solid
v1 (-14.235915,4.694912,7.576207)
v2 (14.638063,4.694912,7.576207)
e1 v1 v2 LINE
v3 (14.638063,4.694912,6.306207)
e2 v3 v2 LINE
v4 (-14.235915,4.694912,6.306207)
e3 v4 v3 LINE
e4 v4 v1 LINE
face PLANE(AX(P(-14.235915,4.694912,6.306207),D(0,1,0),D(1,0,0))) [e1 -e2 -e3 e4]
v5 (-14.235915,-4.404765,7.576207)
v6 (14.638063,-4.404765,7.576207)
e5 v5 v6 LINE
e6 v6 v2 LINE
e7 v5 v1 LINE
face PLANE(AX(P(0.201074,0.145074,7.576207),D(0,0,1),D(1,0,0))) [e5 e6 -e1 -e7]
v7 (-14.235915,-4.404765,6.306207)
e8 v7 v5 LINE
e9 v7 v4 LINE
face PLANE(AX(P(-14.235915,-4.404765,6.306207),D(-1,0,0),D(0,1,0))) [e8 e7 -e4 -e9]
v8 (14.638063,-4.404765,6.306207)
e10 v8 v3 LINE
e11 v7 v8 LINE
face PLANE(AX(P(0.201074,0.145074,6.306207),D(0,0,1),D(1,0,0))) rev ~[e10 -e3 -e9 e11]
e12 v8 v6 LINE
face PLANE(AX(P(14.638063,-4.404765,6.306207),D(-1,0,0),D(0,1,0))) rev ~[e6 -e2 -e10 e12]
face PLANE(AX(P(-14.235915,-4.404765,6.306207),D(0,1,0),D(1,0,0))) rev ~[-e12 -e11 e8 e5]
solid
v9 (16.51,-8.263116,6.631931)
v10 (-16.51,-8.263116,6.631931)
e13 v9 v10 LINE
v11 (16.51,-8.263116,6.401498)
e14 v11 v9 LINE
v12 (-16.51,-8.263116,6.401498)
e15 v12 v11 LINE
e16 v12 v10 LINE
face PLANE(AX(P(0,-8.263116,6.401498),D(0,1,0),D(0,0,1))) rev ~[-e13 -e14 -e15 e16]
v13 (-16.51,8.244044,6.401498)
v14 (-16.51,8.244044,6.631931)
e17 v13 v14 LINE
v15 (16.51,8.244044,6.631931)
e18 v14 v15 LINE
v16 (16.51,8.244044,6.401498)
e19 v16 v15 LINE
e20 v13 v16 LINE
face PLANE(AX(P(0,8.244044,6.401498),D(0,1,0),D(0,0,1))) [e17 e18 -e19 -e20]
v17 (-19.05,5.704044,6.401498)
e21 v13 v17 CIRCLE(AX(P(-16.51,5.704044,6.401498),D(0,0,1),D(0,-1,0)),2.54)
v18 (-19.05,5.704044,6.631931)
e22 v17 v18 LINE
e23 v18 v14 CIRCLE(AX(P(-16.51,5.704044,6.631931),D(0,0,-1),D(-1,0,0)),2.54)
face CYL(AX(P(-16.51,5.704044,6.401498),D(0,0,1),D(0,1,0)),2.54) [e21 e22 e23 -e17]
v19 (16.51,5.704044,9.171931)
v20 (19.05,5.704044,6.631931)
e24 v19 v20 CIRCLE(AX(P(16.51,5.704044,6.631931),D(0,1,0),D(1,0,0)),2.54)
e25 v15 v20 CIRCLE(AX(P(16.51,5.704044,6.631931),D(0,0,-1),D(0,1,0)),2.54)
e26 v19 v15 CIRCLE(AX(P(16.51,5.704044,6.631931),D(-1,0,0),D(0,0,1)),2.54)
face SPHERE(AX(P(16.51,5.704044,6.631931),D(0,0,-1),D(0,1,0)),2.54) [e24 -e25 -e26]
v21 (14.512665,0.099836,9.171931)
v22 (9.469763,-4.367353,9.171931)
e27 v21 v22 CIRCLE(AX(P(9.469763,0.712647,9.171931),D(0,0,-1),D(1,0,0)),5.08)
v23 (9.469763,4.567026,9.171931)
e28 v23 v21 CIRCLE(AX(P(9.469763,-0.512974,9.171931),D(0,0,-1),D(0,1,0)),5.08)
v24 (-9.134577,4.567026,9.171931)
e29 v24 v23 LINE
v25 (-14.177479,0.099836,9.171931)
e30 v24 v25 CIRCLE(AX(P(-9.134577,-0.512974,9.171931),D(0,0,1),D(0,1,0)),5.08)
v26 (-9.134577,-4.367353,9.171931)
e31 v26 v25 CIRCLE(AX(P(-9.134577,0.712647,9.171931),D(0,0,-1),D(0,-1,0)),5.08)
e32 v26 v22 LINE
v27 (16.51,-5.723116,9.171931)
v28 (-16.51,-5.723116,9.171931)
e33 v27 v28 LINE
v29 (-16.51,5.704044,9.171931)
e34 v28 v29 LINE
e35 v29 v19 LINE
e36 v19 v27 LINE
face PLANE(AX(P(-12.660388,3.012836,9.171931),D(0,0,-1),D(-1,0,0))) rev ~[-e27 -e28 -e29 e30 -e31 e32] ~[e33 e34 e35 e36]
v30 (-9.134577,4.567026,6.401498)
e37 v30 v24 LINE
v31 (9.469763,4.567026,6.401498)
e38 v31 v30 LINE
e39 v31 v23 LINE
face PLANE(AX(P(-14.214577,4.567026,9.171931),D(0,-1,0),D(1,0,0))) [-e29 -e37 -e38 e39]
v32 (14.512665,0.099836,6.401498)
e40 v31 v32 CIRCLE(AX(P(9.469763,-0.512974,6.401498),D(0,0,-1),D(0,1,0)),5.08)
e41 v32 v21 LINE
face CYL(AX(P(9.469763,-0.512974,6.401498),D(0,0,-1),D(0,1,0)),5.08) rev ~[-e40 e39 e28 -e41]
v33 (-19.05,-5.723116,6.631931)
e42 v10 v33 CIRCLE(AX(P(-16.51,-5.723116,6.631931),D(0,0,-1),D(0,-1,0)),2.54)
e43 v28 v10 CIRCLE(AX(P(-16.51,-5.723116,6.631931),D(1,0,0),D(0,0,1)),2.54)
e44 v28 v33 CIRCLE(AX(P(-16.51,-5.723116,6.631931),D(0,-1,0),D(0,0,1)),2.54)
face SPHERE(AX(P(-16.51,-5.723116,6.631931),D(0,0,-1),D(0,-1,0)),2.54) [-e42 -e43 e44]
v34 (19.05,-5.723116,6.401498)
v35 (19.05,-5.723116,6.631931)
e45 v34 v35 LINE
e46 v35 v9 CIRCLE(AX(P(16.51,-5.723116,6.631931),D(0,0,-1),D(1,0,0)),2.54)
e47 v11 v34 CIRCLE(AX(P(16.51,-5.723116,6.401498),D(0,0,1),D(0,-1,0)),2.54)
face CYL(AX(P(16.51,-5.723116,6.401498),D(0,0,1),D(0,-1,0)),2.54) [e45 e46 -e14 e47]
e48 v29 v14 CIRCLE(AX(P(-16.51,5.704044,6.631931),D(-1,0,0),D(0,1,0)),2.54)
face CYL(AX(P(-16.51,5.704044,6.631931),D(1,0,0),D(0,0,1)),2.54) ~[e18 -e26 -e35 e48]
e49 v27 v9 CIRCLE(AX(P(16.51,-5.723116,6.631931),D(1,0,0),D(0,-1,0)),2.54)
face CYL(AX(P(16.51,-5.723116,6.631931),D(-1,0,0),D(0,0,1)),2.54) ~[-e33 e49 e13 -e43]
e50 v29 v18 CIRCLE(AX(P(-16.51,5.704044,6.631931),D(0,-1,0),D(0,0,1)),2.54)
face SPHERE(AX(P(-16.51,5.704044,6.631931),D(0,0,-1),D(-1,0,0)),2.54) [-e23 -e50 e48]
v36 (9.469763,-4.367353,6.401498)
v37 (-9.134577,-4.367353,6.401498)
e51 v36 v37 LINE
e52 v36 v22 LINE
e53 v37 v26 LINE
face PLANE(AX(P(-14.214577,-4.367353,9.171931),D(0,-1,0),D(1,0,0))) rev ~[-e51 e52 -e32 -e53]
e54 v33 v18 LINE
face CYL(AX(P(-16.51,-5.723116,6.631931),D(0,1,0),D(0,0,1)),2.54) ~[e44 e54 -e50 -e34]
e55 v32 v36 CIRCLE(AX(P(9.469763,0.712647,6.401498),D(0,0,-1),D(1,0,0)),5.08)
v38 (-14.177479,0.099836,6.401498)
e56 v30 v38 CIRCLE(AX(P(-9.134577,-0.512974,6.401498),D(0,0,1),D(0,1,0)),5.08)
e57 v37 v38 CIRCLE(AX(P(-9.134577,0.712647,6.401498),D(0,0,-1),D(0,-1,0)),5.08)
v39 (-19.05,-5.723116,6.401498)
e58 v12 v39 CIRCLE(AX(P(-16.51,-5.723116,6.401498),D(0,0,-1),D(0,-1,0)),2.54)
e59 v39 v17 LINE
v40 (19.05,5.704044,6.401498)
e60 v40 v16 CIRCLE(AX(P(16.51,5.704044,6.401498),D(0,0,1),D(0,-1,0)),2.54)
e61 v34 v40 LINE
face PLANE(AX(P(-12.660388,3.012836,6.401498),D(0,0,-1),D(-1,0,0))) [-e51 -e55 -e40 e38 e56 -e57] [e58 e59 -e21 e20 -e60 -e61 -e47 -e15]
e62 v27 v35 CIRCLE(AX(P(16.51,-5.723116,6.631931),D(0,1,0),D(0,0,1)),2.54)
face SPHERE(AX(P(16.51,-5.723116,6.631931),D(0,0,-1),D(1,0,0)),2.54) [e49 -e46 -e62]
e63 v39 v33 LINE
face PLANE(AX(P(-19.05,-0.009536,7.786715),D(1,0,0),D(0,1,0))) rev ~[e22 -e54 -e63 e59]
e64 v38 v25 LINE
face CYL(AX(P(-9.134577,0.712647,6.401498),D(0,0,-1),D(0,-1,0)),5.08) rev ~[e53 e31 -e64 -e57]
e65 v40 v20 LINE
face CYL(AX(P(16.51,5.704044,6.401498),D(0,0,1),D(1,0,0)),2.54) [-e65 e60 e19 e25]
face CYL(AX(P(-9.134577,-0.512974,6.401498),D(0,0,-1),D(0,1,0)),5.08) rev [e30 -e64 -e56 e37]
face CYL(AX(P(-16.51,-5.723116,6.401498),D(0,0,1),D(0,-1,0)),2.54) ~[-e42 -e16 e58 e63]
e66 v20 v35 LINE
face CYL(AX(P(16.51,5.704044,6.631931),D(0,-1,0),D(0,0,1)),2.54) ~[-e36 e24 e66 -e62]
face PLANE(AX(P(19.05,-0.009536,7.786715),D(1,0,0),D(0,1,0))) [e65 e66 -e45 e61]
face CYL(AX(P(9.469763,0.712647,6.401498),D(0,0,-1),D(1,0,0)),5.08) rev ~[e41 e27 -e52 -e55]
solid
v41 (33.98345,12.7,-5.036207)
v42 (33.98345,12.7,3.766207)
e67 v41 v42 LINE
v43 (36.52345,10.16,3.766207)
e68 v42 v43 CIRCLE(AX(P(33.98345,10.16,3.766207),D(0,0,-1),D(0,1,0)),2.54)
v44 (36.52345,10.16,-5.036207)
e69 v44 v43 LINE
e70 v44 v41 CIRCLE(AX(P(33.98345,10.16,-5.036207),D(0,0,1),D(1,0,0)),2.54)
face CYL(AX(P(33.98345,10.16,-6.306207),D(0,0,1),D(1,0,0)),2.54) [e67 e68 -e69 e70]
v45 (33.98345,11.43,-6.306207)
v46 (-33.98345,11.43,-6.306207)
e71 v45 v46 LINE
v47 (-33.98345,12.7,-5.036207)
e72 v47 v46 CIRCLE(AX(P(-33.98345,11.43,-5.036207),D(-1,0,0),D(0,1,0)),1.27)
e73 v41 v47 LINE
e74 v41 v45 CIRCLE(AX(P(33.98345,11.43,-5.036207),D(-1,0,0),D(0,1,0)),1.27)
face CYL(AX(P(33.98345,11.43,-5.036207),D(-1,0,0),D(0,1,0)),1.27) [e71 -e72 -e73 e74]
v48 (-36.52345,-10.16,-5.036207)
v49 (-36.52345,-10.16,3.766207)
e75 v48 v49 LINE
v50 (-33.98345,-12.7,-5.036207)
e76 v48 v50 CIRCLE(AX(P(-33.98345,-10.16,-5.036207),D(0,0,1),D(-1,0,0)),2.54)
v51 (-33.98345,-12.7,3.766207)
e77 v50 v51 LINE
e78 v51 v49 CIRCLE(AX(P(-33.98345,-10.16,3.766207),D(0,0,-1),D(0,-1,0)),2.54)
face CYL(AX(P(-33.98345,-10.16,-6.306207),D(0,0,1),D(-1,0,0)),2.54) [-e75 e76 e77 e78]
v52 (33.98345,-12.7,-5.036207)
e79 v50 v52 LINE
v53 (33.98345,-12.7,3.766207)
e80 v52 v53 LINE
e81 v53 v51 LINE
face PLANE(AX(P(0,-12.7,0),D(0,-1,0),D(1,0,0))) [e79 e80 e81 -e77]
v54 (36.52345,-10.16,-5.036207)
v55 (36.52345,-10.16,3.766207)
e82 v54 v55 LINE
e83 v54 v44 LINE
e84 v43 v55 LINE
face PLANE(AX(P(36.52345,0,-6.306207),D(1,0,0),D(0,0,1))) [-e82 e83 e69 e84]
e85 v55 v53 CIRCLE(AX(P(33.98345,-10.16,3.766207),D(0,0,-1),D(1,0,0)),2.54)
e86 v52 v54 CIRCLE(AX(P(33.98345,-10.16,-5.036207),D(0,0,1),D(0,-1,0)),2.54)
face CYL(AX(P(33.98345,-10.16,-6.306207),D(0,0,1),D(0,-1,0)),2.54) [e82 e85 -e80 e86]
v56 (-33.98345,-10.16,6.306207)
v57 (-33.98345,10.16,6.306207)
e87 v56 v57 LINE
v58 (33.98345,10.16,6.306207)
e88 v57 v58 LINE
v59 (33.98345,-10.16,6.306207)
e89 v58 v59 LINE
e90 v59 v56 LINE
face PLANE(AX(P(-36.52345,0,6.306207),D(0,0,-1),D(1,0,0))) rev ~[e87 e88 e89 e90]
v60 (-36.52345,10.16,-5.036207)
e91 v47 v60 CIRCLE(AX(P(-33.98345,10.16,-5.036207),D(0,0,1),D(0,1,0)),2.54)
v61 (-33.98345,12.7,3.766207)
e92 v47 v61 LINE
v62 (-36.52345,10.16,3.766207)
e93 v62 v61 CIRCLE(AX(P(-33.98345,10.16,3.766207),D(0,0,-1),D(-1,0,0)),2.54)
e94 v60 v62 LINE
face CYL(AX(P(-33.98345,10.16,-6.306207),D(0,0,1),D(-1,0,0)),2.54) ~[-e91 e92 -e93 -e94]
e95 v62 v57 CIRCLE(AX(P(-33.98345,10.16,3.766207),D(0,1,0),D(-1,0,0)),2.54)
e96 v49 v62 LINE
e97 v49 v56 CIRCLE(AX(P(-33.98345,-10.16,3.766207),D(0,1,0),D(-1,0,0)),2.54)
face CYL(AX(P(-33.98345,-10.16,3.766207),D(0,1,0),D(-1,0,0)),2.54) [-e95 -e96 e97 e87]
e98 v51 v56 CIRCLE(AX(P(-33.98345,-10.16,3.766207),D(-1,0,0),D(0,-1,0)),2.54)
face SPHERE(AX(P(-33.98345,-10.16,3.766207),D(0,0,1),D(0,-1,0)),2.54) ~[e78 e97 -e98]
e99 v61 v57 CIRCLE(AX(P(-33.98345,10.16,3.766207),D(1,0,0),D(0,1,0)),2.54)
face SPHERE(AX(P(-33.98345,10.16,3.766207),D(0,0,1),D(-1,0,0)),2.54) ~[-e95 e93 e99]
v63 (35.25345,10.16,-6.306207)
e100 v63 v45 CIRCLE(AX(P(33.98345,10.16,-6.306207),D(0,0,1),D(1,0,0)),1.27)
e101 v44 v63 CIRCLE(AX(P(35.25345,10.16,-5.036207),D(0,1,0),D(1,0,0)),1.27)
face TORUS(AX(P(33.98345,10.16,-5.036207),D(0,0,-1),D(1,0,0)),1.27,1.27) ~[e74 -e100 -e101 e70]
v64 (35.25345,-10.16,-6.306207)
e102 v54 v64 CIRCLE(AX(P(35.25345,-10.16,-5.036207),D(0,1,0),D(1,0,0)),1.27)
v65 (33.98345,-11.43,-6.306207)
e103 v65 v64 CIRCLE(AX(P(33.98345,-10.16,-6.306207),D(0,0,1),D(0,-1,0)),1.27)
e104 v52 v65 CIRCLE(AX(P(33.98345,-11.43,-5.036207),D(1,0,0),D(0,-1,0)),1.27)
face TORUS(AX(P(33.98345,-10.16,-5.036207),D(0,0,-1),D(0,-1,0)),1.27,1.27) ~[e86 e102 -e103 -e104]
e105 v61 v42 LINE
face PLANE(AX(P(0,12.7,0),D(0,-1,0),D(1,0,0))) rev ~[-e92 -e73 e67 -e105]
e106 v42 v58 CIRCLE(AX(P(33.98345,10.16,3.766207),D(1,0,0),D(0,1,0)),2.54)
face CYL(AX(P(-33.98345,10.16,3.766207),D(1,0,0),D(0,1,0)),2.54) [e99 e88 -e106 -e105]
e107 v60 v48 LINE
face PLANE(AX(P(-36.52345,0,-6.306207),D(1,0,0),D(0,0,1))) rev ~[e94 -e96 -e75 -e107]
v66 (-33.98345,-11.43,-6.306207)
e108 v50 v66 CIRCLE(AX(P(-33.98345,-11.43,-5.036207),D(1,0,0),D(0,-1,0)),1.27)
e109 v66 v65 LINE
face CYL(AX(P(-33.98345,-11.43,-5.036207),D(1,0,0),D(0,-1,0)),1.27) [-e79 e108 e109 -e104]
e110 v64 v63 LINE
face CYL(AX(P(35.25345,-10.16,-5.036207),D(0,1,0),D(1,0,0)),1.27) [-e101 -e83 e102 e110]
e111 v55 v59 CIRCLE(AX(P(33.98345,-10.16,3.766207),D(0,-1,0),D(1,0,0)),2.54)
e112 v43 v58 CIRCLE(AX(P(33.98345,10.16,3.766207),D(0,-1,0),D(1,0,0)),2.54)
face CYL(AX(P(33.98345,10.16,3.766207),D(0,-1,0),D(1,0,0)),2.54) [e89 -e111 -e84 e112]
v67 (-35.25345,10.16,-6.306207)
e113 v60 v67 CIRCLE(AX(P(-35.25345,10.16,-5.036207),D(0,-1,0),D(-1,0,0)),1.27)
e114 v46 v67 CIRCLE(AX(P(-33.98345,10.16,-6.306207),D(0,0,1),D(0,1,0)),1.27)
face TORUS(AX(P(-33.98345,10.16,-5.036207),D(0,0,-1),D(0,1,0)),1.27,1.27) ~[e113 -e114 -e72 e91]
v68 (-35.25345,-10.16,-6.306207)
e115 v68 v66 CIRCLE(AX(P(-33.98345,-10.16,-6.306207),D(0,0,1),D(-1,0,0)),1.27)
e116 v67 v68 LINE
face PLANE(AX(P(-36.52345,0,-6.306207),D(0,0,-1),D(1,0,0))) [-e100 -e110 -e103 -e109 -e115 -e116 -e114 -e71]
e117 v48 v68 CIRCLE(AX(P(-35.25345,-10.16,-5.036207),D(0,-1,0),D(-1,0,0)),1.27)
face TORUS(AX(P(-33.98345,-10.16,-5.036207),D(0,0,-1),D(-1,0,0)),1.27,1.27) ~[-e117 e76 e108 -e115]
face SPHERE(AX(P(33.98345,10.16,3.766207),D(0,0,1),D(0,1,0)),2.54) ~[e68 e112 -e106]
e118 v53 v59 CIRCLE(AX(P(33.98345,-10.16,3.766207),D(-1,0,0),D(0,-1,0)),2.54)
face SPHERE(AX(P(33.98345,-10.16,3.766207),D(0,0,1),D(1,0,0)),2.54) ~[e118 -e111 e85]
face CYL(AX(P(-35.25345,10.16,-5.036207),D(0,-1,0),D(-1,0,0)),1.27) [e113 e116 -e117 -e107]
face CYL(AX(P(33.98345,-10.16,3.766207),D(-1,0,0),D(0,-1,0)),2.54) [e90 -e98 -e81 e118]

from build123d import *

# Parameters (mm, degrees)
F0_W        = 73.046900332
F0_H        = 12.6124145463
F1_DEPTH    = 12.7
F2_W        = 16.5071599185
F2_H        = 2.7704327367
F3_DEPTH    = 19.05
F4_R        = 2.54
F4_2_R      = 2.54
F5_R        = 2.54
F6_W        = 28.7643400952
F6_H        = 8.9343790896
F7_DEPTH    = 2.54
F8_DEPTH    = 11.938
F9_T1_DEPTH = 2.7704327367
F10_W       = 28.8739772514
F10_H       = 9.0996772051
F11_DEPTH   = 1.27
F12_R       = 2.54
F13_R       = 1.27


# Not quite as in the source:
# - a fillet or chamfer that OpenCascade refuses, or shapes differently, is made with other operations: its cross-section is extruded or revolved along the edge and cut away or added


with BuildPart() as f1:
    # F0 (on Front) → F1 (new body, symmetric)
    with BuildSketch(Plane.XZ):
        Rectangle(F0_W, F0_H)
    extrude(amount=F1_DEPTH, both=True)

    # F4
    f4_edges = [f1.edges().sort_by_distance(p)[0] for p in [
        (-36.52345, 12.7, 0),
        (-36.52345, -12.7, 0),
        (36.52345, 12.7, 0),
        (36.52345, -12.7, 0),
    ]]
    fillet(f4_edges, radius=F4_R)

    # F5
    f5_edges = [f1.edges().sort_by_distance(p)[0] for p in [
        (-35.779501, 11.956051, 6.306207),
    ]]
    fillet(f5_edges, radius=F5_R)

    # F6 (on face) → F7 (cut)
    with BuildSketch(Plane.XY.offset(9.1719310731)):
        with Locations((0.1675928943, 0.0998361502)):
            Rectangle(F6_W, F6_H)
    extrude(amount=F7_DEPTH, mode=Mode.SUBTRACT)

    # F13
    f13_edges = [f1.edges().sort_by_distance(p)[0] for p in [
        (-36.52345, 0, -6.306207),
        (0, -12.7, -6.306207),
        (36.52345, 0, -6.306207),
        (0, 12.7, -6.306207),
        (-35.779501, -11.956051, -6.306207),
        (-35.779501, 11.956051, -6.306207),
        (35.779501, 11.956051, -6.306207),
        (35.779501, -11.956051, -6.306207),
    ]]
    fillet(f13_edges, radius=F13_R)


with BuildPart() as f3:
    # F2 (on Right) → F3 (new body, symmetric)
    with BuildSketch(Plane.YZ):
        with Locations((-0.0095358118, 7.7867147047)):
            Rectangle(F2_W, F2_H)
    extrude(amount=F3_DEPTH, both=True)

    # F4#2
    f4_2_edges = [f3.edges().sort_by_distance(p)[0] for p in [
        (-19.05, -8.263116, 7.786715),
        (19.05, -8.263116, 7.786715),
        (-19.05, 8.244044, 7.786715),
        (19.05, 8.244044, 7.786715),
    ]]
    fillet(f4_2_edges, radius=F4_2_R)

    # F6 (on face) → F8 (cut)
    with BuildSketch(Plane.XY.offset(9.1719310731)):
        with Locations((0.1675928943, 0.0998361502)):
            Rectangle(F6_W, F6_H)
    extrude(amount=-F8_DEPTH, mode=Mode.SUBTRACT)

    # F9: fillet of radius 5.08 on 4 edges, made by hand

    # F9_s2 → F9_t1 (join)
    with BuildSketch(Plane.XY.offset(6.4014983363)):
        with BuildLine():
            ThreePointArc((-9.1345771533, 4.567025695), (-12.7266796018, 3.0791281434), (-14.2145771533, -0.512974305))
            Line((-14.2145771533, -0.512974305), (-14.2145771533, 4.567025695))
            Line((-14.2145771533, 4.567025695), (-9.1345771533, 4.567025695))
        make_face()
        with BuildLine():
            ThreePointArc((14.5497629419, 0.7126466054), (13.0618653903, -2.8794558431), (9.4697629419, -4.3673533946))
            Line((9.4697629419, -4.3673533946), (14.5497629419, -4.3673533946))
            Line((14.5497629419, -4.3673533946), (14.5497629419, 0.7126466054))
        make_face()
        with BuildLine():
            ThreePointArc((-9.1345771533, -4.3673533946), (-12.7266796018, -2.8794558431), (-14.2145771533, 0.7126466054))
            Line((-14.2145771533, 0.7126466054), (-14.2145771533, -4.3673533946))
            Line((-14.2145771533, -4.3673533946), (-9.1345771533, -4.3673533946))
        make_face()
        with BuildLine():
            ThreePointArc((9.4697629419, 4.567025695), (13.0618653903, 3.0791281434), (14.5497629419, -0.512974305))
            Line((14.5497629419, -0.512974305), (14.5497629419, 4.567025695))
            Line((14.5497629419, 4.567025695), (9.4697629419, 4.567025695))
        make_face()
    extrude(amount=F9_T1_DEPTH)

    # F12
    f12_edges = [f3.edges().sort_by_distance(p)[0] for p in [
        (-19.05, -0.009536, 9.171931),
        (-18.306051, -7.519167, 9.171931),
        (-18.306051, 7.500095, 9.171931),
        (0, -8.263116, 9.171931),
        (0, 8.244044, 9.171931),
        (18.306051, -7.519167, 9.171931),
        (18.306051, 7.500095, 9.171931),
        (19.05, -0.009536, 9.171931),
    ]]
    fillet(f12_edges, radius=F12_R)


with BuildPart() as f11:
    # F10 (on face) → F11 (new body)
    with BuildSketch(Plane.XY.offset(6.3062072732)):
        with Locations((0.2010739408, 0.1450735144)):
            Rectangle(F10_W, F10_H)
    extrude(amount=F11_DEPTH)


solid = Compound([f1.part, f3.part, f11.part])
